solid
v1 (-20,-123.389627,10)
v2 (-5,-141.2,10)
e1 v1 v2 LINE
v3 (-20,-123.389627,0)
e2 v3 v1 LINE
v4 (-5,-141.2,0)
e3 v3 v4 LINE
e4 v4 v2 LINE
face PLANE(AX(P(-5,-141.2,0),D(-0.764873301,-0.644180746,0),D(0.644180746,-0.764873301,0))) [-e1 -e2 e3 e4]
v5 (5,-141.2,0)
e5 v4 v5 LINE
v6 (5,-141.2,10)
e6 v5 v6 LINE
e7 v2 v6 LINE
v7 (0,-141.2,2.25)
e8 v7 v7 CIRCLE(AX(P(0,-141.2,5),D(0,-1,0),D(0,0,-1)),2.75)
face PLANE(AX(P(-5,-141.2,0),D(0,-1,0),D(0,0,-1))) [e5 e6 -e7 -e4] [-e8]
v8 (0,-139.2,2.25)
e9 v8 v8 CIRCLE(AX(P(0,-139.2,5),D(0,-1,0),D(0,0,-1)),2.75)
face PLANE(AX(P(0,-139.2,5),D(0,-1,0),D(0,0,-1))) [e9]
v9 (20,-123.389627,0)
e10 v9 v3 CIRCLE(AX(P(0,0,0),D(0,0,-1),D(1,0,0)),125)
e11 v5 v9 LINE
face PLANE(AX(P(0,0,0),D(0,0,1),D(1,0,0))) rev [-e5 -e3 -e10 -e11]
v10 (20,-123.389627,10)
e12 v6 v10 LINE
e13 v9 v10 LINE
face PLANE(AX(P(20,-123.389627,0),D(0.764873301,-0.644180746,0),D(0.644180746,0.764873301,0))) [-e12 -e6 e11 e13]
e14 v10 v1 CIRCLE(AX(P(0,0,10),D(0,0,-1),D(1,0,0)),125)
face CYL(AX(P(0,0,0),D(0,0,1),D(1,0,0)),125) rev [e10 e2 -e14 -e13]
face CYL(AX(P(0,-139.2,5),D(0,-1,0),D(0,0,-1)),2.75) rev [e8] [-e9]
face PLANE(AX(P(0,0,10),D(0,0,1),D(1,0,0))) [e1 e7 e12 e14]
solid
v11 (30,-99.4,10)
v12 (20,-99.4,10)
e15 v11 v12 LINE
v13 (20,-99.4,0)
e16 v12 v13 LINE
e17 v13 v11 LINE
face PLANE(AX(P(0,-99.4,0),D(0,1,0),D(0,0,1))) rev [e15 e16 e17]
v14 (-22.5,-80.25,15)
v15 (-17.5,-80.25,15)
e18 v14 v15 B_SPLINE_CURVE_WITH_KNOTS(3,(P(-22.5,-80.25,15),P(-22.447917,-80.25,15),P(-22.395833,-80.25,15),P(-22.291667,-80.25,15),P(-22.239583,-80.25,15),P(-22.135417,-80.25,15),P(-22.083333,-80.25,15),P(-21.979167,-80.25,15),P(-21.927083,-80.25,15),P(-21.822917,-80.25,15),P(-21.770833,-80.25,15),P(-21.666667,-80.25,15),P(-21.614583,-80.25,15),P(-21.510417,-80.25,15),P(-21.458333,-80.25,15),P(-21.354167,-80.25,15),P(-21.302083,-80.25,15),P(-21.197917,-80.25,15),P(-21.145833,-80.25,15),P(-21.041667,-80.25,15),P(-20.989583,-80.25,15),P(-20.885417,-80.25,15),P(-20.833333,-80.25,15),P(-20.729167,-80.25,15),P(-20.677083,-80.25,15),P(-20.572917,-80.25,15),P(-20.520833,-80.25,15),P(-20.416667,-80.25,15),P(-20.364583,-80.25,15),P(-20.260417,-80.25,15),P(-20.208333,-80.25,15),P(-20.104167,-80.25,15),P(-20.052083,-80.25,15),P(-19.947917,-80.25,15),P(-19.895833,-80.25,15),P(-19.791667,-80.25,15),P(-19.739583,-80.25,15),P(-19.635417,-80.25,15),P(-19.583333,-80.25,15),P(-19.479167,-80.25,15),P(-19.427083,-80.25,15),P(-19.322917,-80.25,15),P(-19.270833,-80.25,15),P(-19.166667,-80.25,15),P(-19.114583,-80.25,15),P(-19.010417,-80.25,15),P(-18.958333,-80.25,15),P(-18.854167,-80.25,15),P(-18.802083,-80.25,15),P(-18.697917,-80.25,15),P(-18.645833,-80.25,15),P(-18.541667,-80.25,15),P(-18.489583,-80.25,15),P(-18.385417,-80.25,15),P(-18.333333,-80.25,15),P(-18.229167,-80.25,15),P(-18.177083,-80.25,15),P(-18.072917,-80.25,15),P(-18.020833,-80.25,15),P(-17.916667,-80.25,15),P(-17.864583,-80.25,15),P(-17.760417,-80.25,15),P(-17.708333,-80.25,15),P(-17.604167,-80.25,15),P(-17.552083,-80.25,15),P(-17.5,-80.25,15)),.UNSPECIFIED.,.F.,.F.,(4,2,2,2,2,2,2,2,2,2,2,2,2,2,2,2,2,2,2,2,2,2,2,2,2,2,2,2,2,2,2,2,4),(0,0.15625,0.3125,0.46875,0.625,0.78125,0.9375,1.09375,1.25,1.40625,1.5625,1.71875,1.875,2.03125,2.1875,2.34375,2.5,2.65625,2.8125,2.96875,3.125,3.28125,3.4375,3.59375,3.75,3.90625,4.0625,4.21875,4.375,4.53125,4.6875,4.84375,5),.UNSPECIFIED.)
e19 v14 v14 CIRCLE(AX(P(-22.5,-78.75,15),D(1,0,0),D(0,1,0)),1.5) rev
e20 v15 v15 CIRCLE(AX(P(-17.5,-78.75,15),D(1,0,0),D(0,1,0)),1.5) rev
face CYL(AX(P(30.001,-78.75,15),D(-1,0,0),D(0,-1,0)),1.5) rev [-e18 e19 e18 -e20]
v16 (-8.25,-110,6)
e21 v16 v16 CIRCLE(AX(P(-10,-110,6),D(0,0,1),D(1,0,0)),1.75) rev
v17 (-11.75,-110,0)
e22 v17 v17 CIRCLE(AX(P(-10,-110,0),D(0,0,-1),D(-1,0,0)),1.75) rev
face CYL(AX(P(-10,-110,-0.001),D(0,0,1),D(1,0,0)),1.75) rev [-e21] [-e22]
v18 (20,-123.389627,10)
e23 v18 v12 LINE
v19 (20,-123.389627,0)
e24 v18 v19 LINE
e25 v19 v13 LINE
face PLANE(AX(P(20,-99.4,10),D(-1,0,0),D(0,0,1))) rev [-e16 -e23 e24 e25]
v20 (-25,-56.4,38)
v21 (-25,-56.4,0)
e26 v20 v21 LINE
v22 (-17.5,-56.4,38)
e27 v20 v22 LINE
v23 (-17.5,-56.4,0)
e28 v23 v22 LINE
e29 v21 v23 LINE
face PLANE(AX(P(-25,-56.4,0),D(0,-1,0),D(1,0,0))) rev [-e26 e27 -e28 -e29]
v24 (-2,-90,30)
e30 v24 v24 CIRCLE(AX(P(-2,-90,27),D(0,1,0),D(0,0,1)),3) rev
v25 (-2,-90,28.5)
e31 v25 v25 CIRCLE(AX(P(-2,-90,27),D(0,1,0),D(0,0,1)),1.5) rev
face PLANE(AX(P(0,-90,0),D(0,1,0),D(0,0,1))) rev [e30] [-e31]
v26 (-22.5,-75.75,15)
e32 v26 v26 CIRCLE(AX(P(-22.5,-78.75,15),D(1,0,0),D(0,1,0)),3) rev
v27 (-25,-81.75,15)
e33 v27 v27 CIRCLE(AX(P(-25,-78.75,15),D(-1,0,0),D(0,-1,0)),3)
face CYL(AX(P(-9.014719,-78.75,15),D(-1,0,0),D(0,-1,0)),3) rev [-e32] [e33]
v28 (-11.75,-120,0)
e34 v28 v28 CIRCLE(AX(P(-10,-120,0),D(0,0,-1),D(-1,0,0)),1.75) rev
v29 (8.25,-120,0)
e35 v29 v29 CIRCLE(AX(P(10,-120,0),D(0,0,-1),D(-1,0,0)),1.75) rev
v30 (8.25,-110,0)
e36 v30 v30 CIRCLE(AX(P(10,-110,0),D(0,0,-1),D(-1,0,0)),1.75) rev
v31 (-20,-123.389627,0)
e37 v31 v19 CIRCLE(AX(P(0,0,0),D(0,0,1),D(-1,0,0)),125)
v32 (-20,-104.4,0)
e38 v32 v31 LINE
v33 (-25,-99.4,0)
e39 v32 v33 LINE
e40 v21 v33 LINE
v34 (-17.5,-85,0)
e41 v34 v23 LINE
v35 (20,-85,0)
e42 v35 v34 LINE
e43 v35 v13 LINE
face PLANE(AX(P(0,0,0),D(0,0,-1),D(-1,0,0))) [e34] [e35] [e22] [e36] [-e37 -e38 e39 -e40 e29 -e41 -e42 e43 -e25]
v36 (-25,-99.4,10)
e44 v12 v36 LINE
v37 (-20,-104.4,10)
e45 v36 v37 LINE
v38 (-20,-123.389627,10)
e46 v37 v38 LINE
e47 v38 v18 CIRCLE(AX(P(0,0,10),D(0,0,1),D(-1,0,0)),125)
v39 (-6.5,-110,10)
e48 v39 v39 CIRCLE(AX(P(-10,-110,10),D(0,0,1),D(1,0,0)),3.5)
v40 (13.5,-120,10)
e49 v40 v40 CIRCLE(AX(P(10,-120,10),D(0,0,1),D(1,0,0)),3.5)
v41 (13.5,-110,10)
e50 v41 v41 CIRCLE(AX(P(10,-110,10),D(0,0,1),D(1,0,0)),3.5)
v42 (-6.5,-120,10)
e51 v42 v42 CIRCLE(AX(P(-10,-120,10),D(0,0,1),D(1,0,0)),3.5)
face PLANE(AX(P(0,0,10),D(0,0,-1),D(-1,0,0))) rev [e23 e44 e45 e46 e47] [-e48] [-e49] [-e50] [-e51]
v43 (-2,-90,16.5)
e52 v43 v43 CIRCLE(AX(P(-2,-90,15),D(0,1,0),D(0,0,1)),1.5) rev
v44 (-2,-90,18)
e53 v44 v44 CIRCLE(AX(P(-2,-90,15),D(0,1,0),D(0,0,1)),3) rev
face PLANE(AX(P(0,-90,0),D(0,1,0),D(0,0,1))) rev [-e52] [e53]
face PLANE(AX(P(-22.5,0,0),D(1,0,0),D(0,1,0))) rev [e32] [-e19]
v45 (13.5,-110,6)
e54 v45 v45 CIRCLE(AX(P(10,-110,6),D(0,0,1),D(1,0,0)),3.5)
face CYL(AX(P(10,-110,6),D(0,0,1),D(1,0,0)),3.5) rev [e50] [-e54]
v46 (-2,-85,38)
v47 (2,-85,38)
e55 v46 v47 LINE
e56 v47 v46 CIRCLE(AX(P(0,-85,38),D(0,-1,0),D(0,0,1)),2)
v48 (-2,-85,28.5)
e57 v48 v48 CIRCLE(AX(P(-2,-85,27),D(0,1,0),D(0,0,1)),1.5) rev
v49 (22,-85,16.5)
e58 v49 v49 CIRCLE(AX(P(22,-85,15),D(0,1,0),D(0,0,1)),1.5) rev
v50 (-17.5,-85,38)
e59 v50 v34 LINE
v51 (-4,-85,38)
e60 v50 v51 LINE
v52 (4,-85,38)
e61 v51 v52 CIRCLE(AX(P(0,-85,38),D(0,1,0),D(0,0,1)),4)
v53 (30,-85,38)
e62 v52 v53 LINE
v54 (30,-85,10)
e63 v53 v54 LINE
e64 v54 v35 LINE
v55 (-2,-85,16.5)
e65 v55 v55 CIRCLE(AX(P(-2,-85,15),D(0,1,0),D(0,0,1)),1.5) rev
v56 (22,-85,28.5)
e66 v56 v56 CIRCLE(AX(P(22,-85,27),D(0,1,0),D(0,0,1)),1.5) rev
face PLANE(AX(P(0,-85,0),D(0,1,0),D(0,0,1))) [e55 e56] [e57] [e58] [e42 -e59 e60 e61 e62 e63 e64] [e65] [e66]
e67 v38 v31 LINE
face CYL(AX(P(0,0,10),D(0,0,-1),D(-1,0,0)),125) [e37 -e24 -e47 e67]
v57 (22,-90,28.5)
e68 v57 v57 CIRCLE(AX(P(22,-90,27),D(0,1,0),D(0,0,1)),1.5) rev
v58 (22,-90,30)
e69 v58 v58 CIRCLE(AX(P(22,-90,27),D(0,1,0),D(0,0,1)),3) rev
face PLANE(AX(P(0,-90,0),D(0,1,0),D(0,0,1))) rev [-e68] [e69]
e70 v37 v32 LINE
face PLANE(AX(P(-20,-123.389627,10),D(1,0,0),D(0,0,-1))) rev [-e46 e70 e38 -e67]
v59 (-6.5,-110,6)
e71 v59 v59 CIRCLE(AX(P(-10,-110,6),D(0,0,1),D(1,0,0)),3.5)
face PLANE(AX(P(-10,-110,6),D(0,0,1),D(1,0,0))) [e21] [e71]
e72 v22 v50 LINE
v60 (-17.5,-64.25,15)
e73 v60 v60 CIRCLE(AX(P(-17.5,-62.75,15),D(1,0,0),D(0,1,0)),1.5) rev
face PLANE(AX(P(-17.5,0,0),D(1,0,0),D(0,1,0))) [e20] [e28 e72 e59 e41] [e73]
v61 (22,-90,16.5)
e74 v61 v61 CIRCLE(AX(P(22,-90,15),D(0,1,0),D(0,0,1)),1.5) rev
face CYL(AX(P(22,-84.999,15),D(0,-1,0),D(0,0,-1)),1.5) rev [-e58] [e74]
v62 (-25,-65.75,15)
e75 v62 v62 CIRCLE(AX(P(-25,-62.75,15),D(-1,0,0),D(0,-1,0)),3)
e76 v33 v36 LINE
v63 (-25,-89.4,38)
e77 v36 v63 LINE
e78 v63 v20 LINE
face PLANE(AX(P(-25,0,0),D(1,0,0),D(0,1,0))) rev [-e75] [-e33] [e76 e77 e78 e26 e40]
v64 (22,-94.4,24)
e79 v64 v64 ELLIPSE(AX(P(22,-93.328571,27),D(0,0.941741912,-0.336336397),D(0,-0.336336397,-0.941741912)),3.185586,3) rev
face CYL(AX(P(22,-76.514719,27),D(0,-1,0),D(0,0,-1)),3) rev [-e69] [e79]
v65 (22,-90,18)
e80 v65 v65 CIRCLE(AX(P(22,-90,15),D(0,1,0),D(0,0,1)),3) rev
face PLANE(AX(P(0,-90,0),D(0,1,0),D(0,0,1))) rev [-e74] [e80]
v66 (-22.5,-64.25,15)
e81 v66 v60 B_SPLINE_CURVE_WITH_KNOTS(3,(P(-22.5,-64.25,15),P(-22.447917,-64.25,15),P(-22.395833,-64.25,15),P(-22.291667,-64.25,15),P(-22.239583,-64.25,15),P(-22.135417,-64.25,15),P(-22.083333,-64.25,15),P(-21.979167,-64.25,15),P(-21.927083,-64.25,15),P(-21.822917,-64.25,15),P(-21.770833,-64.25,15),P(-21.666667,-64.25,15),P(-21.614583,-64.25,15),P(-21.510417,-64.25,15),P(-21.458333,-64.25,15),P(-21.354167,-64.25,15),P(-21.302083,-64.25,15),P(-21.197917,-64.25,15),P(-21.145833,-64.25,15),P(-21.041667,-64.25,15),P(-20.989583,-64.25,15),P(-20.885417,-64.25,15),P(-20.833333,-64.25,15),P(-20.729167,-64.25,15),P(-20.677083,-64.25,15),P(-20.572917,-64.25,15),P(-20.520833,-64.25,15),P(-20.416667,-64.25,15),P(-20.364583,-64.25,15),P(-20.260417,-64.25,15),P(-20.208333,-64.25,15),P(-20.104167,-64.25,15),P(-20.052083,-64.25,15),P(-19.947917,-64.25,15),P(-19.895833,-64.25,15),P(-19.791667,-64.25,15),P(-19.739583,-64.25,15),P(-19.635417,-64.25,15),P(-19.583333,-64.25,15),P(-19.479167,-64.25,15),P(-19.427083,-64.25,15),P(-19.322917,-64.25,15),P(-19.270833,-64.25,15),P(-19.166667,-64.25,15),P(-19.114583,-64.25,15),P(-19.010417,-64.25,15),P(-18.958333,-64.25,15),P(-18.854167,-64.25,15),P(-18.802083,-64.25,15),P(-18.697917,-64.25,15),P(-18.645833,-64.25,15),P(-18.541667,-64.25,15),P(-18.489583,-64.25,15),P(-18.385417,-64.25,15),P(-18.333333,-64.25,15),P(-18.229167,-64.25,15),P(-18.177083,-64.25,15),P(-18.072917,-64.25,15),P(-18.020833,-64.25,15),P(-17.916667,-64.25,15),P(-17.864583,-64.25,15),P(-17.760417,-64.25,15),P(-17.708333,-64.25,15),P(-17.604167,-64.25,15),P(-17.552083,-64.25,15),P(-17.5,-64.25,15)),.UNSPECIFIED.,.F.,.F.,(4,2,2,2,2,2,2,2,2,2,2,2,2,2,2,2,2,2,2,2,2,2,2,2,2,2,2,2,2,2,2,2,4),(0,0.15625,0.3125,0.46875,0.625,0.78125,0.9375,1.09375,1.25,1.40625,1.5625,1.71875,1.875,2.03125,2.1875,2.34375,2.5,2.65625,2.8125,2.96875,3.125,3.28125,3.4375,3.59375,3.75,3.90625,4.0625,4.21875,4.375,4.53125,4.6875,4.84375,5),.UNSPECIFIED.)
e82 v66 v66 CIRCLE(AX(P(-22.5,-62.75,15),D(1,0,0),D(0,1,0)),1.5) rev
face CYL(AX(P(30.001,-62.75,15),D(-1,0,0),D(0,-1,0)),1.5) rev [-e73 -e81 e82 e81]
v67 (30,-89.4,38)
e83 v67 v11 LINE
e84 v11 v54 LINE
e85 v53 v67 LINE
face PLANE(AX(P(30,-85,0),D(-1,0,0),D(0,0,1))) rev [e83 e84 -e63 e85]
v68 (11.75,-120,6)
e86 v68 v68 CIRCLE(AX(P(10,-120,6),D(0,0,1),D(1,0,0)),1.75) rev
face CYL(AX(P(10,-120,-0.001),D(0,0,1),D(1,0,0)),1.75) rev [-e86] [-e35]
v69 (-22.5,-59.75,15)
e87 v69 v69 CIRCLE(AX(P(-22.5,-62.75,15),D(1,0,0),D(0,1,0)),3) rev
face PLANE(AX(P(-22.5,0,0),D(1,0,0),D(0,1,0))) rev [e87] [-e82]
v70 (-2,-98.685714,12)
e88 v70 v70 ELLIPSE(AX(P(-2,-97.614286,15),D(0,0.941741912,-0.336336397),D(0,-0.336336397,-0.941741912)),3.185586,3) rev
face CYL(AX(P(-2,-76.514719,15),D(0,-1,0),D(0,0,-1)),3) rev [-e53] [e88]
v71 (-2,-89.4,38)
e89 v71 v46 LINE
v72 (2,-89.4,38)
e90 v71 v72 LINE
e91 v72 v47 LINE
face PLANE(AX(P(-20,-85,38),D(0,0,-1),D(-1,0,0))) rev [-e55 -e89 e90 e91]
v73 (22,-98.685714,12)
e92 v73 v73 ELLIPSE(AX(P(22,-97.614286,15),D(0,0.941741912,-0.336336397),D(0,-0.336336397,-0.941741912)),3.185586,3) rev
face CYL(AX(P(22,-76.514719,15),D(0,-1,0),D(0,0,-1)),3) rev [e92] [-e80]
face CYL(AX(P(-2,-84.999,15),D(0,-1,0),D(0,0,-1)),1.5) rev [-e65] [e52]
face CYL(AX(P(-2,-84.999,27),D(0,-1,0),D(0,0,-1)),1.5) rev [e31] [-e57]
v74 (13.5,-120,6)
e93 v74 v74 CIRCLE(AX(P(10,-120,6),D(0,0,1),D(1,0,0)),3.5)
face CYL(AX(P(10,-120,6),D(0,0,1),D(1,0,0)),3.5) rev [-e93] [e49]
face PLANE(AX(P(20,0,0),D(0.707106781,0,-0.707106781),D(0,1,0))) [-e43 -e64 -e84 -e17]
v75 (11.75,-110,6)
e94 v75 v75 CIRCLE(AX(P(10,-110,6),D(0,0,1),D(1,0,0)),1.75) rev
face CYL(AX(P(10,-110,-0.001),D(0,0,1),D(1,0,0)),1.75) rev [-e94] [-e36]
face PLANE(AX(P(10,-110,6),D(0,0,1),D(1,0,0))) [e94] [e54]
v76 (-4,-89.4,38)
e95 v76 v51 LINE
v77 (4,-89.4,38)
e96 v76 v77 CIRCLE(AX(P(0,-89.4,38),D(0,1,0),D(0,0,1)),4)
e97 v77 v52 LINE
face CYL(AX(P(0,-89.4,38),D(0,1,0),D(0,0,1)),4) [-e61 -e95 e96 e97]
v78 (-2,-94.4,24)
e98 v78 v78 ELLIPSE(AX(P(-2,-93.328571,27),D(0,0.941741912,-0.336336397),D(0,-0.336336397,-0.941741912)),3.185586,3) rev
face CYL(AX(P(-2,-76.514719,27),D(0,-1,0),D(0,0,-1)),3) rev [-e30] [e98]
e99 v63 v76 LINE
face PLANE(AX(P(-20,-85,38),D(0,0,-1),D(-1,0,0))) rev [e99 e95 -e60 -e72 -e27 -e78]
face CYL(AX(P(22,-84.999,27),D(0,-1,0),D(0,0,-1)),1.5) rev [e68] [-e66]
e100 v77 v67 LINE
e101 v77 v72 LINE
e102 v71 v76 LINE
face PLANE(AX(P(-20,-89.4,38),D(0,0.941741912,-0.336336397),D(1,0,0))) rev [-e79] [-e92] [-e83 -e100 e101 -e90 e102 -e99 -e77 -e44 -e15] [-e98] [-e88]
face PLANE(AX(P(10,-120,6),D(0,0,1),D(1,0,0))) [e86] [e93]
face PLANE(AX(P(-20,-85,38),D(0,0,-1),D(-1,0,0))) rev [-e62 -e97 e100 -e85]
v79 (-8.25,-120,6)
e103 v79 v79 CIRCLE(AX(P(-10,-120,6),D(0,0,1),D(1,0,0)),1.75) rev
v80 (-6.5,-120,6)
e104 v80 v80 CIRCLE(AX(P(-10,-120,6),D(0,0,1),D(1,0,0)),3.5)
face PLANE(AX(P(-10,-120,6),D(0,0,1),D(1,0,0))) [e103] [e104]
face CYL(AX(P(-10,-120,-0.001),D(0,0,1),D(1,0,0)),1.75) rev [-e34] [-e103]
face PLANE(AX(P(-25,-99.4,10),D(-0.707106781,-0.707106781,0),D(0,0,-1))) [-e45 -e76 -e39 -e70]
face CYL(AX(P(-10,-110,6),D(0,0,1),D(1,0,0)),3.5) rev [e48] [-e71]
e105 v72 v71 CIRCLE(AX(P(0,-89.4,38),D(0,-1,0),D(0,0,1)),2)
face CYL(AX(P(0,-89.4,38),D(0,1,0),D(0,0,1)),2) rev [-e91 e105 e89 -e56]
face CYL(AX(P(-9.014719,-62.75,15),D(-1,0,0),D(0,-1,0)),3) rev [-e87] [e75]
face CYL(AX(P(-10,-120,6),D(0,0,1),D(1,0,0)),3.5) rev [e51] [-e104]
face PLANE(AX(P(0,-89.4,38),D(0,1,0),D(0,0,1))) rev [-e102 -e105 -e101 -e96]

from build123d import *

# Parameters (mm, degrees)
BOSS_EXTRU_1_DEPTH      = 10
ENL_V_MAT_EXTRU_1_REACH = 128.984
ESQUISSE2_R             = 1.75
ESQUISSE4_R             = 3.5
ENL_V_MAT_EXTRU_2_DEPTH = 4
ESQUISSE5_W             = 50
ESQUISSE5_H             = 38
BOSS_EXTRU_2_DEPTH      = 14.4
ENL_V_MAT_EXTRU_3_REACH = 56.766
ESQUISSE6_R             = 1.5
ESQUISSE7_R             = 3
ENL_V_MAT_EXTRU_4_DEPTH = 9.4
CHANFREIN1_SIZE         = 10
CHANFREIN2_SIZE         = 28
CHANFREIN2_SIZE_2       = 10
BOSS_EXTRU_3_DEPTH      = 5
ESQUISSE9_W             = 38
ESQUISSE9_H             = 28.6
BOSS_EXTRU_4_DEPTH      = 2.5
CHANFREIN3_SIZE         = 5
ENL_V_MAT_EXTRU_5_REACH = 143.753
ESQUISSE10_R            = 1.5
ESQUISSE11_R            = 3
ENL_V_MAT_EXTRU_6_DEPTH = 2.5
BOSS_EXTRU_5_DEPTH      = 10
ESQUISSE14_R            = 2.75
ENL_V_MAT_EXTRU_7_DEPTH = 2
BOSS_EXTRU_6_DEPTH      = 4.4


# Some blends are built 0.0001 mm under size
with BuildPart() as part:
    # Esquisse1 → Boss.-Extru.1 (new body)
    with BuildSketch(Plane.XY):
        with BuildLine():
            Line((-20, -123.389626793), (-20, -99.4))
            Line((-20, -99.4), (20, -99.4))
            Line((20, -99.4), (20, -123.389626793))
            ThreePointArc((20, -123.389626793), (0, -125), (-20, -123.389626793))
        make_face()
    extrude(amount=BOSS_EXTRU_1_DEPTH)

    # Esquisse2 → Enlèv. mat.-Extru.1 (cut, up to next)
    with BuildSketch(Plane.XY.offset(10), mode=Mode.PRIVATE) as enl_v_mat_extru_1_sk1:
        with Locations((-10, -110)):
            Circle(ESQUISSE2_R)
    enl_v_mat_extru_1_tool1 = extrude(enl_v_mat_extru_1_sk1.sketch, amount=-ENL_V_MAT_EXTRU_1_REACH, mode=Mode.PRIVATE) & part.part
    # Esquisse2 → Enlèv. mat.-Extru.1 (cut, up to next)
    with BuildSketch(Plane.XY.offset(10), mode=Mode.PRIVATE) as enl_v_mat_extru_1_sk2:
        with Locations((-10, -120)):
            Circle(ESQUISSE2_R)
    enl_v_mat_extru_1_tool2 = extrude(enl_v_mat_extru_1_sk2.sketch, amount=-ENL_V_MAT_EXTRU_1_REACH, mode=Mode.PRIVATE) & part.part
    # Esquisse2 → Enlèv. mat.-Extru.1 (cut, up to next)
    with BuildSketch(Plane.XY.offset(10), mode=Mode.PRIVATE) as enl_v_mat_extru_1_sk3:
        with Locations((10, -110)):
            Circle(ESQUISSE2_R)
    enl_v_mat_extru_1_tool3 = extrude(enl_v_mat_extru_1_sk3.sketch, amount=-ENL_V_MAT_EXTRU_1_REACH, mode=Mode.PRIVATE) & part.part
    # Esquisse2 → Enlèv. mat.-Extru.1 (cut, up to next)
    with BuildSketch(Plane.XY.offset(10), mode=Mode.PRIVATE) as enl_v_mat_extru_1_sk4:
        with Locations((10, -120)):
            Circle(ESQUISSE2_R)
    enl_v_mat_extru_1_tool4 = extrude(enl_v_mat_extru_1_sk4.sketch, amount=-ENL_V_MAT_EXTRU_1_REACH, mode=Mode.PRIVATE) & part.part
    add(enl_v_mat_extru_1_tool1.solids().sort_by_distance((-10, -110, 10))[0], mode=Mode.SUBTRACT)
    add(enl_v_mat_extru_1_tool2.solids().sort_by_distance((-10, -120, 10))[0], mode=Mode.SUBTRACT)
    add(enl_v_mat_extru_1_tool3.solids().sort_by_distance((10, -110, 10))[0], mode=Mode.SUBTRACT)
    add(enl_v_mat_extru_1_tool4.solids().sort_by_distance((10, -120, 10))[0], mode=Mode.SUBTRACT)

    # Esquisse4 → Enlèv. mat.-Extru.2 (cut)
    with BuildSketch(Plane.XY.offset(10)):
        with Locations((-10, -110)):
            Circle(ESQUISSE4_R)
        with Locations((10, -110)):
            Circle(ESQUISSE4_R)
        with Locations((10, -120)):
            Circle(ESQUISSE4_R)
        with Locations((-10, -120)):
            Circle(ESQUISSE4_R)
    extrude(amount=-ENL_V_MAT_EXTRU_2_DEPTH, mode=Mode.SUBTRACT)

    # Esquisse5 → Boss.-Extru.2 (add)
    with BuildSketch(Plane(origin=(0, -99.4, 0), x_dir=(1, 0, 0), z_dir=(0, 1, 0))):
        with Locations((5, -19)):
            Rectangle(ESQUISSE5_W, ESQUISSE5_H)
    extrude(amount=BOSS_EXTRU_2_DEPTH)

    # Esquisse6 → Enlèv. mat.-Extru.3 (cut, up to next)
    with BuildSketch(Plane.XZ.offset(99.4), mode=Mode.PRIVATE) as enl_v_mat_extru_3_sk1:
        with Locations(Location((-2, 27, 0), (0, 0, 270))):
            Circle(ESQUISSE6_R)
    enl_v_mat_extru_3_tool1 = extrude(enl_v_mat_extru_3_sk1.sketch, amount=-ENL_V_MAT_EXTRU_3_REACH, mode=Mode.PRIVATE) & part.part
    # Esquisse6 → Enlèv. mat.-Extru.3 (cut, up to next)
    with BuildSketch(Plane.XZ.offset(99.4), mode=Mode.PRIVATE) as enl_v_mat_extru_3_sk2:
        with Locations(Location((22, 27, 0), (0, 0, 270))):
            Circle(ESQUISSE6_R)
    enl_v_mat_extru_3_tool2 = extrude(enl_v_mat_extru_3_sk2.sketch, amount=-ENL_V_MAT_EXTRU_3_REACH, mode=Mode.PRIVATE) & part.part
    # Esquisse6 → Enlèv. mat.-Extru.3 (cut, up to next)
    with BuildSketch(Plane.XZ.offset(99.4), mode=Mode.PRIVATE) as enl_v_mat_extru_3_sk3:
        with Locations(Location((-2, 15, 0), (0, 0, 270))):
            Circle(ESQUISSE6_R)
    enl_v_mat_extru_3_tool3 = extrude(enl_v_mat_extru_3_sk3.sketch, amount=-ENL_V_MAT_EXTRU_3_REACH, mode=Mode.PRIVATE) & part.part
    # Esquisse6 → Enlèv. mat.-Extru.3 (cut, up to next)
    with BuildSketch(Plane.XZ.offset(99.4), mode=Mode.PRIVATE) as enl_v_mat_extru_3_sk4:
        with Locations(Location((22, 15, 0), (0, 0, 270))):
            Circle(ESQUISSE6_R)
    enl_v_mat_extru_3_tool4 = extrude(enl_v_mat_extru_3_sk4.sketch, amount=-ENL_V_MAT_EXTRU_3_REACH, mode=Mode.PRIVATE) & part.part
    add(enl_v_mat_extru_3_tool1.solids().sort_by_distance((-2, -99.4, 27))[0], mode=Mode.SUBTRACT)
    add(enl_v_mat_extru_3_tool2.solids().sort_by_distance((22, -99.4, 27))[0], mode=Mode.SUBTRACT)
    add(enl_v_mat_extru_3_tool3.solids().sort_by_distance((-2, -99.4, 15))[0], mode=Mode.SUBTRACT)
    add(enl_v_mat_extru_3_tool4.solids().sort_by_distance((22, -99.4, 15))[0], mode=Mode.SUBTRACT)

    # Esquisse7 → Enlèv. mat.-Extru.4 (cut)
    with BuildSketch(Plane.XZ.offset(99.4)):
        with Locations(Location((-2, 27, 0), (0, 0, 270))):
            Circle(ESQUISSE7_R)
        with Locations(Location((22, 27, 0), (0, 0, 270))):
            Circle(ESQUISSE7_R)
        with Locations(Location((22, 15, 0), (0, 0, 270))):
            Circle(ESQUISSE7_R)
        with Locations(Location((-2, 15, 0), (0, 0, 270))):
            Circle(ESQUISSE7_R)
    extrude(amount=-ENL_V_MAT_EXTRU_4_DEPTH, mode=Mode.SUBTRACT)

    # Chanfrein1
    chanfrein1_edges = [part.edges().sort_by_distance(p)[0] for p in [
        (30, -92.2, 0),
    ]]
    chamfer(chanfrein1_edges, length=CHANFREIN1_SIZE)

    # Chanfrein2
    # the kernel refuses this chamfer: 28, 10 mm, written as the material it takes off along each edge
    with BuildSketch(Plane(origin=(102.642981969, -99.4, 38), x_dir=(0, -0.01296397650632004, -0.9999159641255577), z_dir=(-1, 0, 0))) as chanfrein2_piece_1:
        Polygon((CHANFREIN2_SIZE * 0.999915964126, -CHANFREIN2_SIZE * 0.0129639765063), (-CHANFREIN2_SIZE_2 * 0.0129639765063, -CHANFREIN2_SIZE_2 * 0.999915964126), (0, 0), align=None)
    extrude(amount=195.285963938, mode=Mode.SUBTRACT)

    # Esquisse8 → Boss.-Extru.3 (add)
    with BuildSketch(Plane.ZY.offset(20)):
        Polygon((10, -99.4), (0, -99.4), (0, -56.4), (38, -56.4), (38, -89.4), align=None)
    extrude(amount=BOSS_EXTRU_3_DEPTH)

    # Esquisse9 → Boss.-Extru.4 (add)
    with BuildSketch(Plane(origin=(-20, 0, 0), x_dir=(0, 0, -1), z_dir=(1, 0, 0))):
        with Locations((-19, -70.7)):
            Rectangle(ESQUISSE9_W, ESQUISSE9_H)
    extrude(amount=BOSS_EXTRU_4_DEPTH)

    # Chanfrein3
    chanfrein3_edges = [part.edges().sort_by_distance(p)[0] for p in [
        (-20, -99.4, 5),
    ]]
    chamfer(chanfrein3_edges, length=CHANFREIN3_SIZE - 0.0001)  # a hair under: the kernel refuses the full size

    # Esquisse10 → Enlèv. mat.-Extru.5 (cut, up to next)
    with BuildSketch(Plane.ZY.offset(25), mode=Mode.PRIVATE) as enl_v_mat_extru_5_sk1:
        with Locations(Location((15, -62.75, 0), (0, 0, 270))):
            Circle(ESQUISSE10_R)
    enl_v_mat_extru_5_tool1 = extrude(enl_v_mat_extru_5_sk1.sketch, amount=-ENL_V_MAT_EXTRU_5_REACH, mode=Mode.PRIVATE) & part.part
    # Esquisse10 → Enlèv. mat.-Extru.5 (cut, up to next)
    with BuildSketch(Plane.ZY.offset(25), mode=Mode.PRIVATE) as enl_v_mat_extru_5_sk2:
        with Locations(Location((15, -78.75, 0), (0, 0, 270))):
            Circle(ESQUISSE10_R)
    enl_v_mat_extru_5_tool2 = extrude(enl_v_mat_extru_5_sk2.sketch, amount=-ENL_V_MAT_EXTRU_5_REACH, mode=Mode.PRIVATE) & part.part
    add(enl_v_mat_extru_5_tool1.solids().sort_by_distance((-25, -62.75, 15))[0], mode=Mode.SUBTRACT)
    add(enl_v_mat_extru_5_tool2.solids().sort_by_distance((-25, -78.75, 15))[0], mode=Mode.SUBTRACT)

    # Esquisse11 → Enlèv. mat.-Extru.6 (cut)
    with BuildSketch(Plane.ZY.offset(25)):
        with Locations(Location((15, -62.75, 0), (0, 0, 270))):
            Circle(ESQUISSE11_R)
        with Locations(Location((15, -78.75, 0), (0, 0, 270))):
            Circle(ESQUISSE11_R)
    extrude(amount=-ENL_V_MAT_EXTRU_6_DEPTH, mode=Mode.SUBTRACT)

    # Esquisse15 → Boss.-Extru.6 (add)
    with BuildSketch(Plane(origin=(0, -85, 0), x_dir=(1, 0, 0), z_dir=(0, 1, 0))):
        with BuildLine():
            Line((4, -38), (2, -38))
            ThreePointArc((2, -38), (0, -40), (-2, -38))
            Line((-2, -38), (-4, -38))
            ThreePointArc((-4, -38), (0, -42), (4, -38))
        make_face()
    extrude(amount=-BOSS_EXTRU_6_DEPTH)


with BuildPart() as body_2:
    # Esquisse12 → Boss.-Extru.5 (new body)
    with BuildSketch(Plane.XY.offset(10)):
        with BuildLine():
            Line((-5, -141.2), (5, -141.2))
            Line((5, -141.2), (20, -123.389626793))
            ThreePointArc((20, -123.389626793), (0, -125), (-20, -123.389626793))
            Line((-20, -123.389626793), (-5, -141.2))
        make_face()
    extrude(amount=-BOSS_EXTRU_5_DEPTH)

    # Esquisse14 → Enlèv. mat.-Extru.7 (cut)
    with BuildSketch(Plane.XZ.offset(141.2)):
        with Locations(Location((0, 5, 0), (0, 0, 270))):
            Circle(ESQUISSE14_R)
    extrude(amount=-ENL_V_MAT_EXTRU_7_DEPTH, mode=Mode.SUBTRACT)


solid = Compound([part.part, body_2.part])
